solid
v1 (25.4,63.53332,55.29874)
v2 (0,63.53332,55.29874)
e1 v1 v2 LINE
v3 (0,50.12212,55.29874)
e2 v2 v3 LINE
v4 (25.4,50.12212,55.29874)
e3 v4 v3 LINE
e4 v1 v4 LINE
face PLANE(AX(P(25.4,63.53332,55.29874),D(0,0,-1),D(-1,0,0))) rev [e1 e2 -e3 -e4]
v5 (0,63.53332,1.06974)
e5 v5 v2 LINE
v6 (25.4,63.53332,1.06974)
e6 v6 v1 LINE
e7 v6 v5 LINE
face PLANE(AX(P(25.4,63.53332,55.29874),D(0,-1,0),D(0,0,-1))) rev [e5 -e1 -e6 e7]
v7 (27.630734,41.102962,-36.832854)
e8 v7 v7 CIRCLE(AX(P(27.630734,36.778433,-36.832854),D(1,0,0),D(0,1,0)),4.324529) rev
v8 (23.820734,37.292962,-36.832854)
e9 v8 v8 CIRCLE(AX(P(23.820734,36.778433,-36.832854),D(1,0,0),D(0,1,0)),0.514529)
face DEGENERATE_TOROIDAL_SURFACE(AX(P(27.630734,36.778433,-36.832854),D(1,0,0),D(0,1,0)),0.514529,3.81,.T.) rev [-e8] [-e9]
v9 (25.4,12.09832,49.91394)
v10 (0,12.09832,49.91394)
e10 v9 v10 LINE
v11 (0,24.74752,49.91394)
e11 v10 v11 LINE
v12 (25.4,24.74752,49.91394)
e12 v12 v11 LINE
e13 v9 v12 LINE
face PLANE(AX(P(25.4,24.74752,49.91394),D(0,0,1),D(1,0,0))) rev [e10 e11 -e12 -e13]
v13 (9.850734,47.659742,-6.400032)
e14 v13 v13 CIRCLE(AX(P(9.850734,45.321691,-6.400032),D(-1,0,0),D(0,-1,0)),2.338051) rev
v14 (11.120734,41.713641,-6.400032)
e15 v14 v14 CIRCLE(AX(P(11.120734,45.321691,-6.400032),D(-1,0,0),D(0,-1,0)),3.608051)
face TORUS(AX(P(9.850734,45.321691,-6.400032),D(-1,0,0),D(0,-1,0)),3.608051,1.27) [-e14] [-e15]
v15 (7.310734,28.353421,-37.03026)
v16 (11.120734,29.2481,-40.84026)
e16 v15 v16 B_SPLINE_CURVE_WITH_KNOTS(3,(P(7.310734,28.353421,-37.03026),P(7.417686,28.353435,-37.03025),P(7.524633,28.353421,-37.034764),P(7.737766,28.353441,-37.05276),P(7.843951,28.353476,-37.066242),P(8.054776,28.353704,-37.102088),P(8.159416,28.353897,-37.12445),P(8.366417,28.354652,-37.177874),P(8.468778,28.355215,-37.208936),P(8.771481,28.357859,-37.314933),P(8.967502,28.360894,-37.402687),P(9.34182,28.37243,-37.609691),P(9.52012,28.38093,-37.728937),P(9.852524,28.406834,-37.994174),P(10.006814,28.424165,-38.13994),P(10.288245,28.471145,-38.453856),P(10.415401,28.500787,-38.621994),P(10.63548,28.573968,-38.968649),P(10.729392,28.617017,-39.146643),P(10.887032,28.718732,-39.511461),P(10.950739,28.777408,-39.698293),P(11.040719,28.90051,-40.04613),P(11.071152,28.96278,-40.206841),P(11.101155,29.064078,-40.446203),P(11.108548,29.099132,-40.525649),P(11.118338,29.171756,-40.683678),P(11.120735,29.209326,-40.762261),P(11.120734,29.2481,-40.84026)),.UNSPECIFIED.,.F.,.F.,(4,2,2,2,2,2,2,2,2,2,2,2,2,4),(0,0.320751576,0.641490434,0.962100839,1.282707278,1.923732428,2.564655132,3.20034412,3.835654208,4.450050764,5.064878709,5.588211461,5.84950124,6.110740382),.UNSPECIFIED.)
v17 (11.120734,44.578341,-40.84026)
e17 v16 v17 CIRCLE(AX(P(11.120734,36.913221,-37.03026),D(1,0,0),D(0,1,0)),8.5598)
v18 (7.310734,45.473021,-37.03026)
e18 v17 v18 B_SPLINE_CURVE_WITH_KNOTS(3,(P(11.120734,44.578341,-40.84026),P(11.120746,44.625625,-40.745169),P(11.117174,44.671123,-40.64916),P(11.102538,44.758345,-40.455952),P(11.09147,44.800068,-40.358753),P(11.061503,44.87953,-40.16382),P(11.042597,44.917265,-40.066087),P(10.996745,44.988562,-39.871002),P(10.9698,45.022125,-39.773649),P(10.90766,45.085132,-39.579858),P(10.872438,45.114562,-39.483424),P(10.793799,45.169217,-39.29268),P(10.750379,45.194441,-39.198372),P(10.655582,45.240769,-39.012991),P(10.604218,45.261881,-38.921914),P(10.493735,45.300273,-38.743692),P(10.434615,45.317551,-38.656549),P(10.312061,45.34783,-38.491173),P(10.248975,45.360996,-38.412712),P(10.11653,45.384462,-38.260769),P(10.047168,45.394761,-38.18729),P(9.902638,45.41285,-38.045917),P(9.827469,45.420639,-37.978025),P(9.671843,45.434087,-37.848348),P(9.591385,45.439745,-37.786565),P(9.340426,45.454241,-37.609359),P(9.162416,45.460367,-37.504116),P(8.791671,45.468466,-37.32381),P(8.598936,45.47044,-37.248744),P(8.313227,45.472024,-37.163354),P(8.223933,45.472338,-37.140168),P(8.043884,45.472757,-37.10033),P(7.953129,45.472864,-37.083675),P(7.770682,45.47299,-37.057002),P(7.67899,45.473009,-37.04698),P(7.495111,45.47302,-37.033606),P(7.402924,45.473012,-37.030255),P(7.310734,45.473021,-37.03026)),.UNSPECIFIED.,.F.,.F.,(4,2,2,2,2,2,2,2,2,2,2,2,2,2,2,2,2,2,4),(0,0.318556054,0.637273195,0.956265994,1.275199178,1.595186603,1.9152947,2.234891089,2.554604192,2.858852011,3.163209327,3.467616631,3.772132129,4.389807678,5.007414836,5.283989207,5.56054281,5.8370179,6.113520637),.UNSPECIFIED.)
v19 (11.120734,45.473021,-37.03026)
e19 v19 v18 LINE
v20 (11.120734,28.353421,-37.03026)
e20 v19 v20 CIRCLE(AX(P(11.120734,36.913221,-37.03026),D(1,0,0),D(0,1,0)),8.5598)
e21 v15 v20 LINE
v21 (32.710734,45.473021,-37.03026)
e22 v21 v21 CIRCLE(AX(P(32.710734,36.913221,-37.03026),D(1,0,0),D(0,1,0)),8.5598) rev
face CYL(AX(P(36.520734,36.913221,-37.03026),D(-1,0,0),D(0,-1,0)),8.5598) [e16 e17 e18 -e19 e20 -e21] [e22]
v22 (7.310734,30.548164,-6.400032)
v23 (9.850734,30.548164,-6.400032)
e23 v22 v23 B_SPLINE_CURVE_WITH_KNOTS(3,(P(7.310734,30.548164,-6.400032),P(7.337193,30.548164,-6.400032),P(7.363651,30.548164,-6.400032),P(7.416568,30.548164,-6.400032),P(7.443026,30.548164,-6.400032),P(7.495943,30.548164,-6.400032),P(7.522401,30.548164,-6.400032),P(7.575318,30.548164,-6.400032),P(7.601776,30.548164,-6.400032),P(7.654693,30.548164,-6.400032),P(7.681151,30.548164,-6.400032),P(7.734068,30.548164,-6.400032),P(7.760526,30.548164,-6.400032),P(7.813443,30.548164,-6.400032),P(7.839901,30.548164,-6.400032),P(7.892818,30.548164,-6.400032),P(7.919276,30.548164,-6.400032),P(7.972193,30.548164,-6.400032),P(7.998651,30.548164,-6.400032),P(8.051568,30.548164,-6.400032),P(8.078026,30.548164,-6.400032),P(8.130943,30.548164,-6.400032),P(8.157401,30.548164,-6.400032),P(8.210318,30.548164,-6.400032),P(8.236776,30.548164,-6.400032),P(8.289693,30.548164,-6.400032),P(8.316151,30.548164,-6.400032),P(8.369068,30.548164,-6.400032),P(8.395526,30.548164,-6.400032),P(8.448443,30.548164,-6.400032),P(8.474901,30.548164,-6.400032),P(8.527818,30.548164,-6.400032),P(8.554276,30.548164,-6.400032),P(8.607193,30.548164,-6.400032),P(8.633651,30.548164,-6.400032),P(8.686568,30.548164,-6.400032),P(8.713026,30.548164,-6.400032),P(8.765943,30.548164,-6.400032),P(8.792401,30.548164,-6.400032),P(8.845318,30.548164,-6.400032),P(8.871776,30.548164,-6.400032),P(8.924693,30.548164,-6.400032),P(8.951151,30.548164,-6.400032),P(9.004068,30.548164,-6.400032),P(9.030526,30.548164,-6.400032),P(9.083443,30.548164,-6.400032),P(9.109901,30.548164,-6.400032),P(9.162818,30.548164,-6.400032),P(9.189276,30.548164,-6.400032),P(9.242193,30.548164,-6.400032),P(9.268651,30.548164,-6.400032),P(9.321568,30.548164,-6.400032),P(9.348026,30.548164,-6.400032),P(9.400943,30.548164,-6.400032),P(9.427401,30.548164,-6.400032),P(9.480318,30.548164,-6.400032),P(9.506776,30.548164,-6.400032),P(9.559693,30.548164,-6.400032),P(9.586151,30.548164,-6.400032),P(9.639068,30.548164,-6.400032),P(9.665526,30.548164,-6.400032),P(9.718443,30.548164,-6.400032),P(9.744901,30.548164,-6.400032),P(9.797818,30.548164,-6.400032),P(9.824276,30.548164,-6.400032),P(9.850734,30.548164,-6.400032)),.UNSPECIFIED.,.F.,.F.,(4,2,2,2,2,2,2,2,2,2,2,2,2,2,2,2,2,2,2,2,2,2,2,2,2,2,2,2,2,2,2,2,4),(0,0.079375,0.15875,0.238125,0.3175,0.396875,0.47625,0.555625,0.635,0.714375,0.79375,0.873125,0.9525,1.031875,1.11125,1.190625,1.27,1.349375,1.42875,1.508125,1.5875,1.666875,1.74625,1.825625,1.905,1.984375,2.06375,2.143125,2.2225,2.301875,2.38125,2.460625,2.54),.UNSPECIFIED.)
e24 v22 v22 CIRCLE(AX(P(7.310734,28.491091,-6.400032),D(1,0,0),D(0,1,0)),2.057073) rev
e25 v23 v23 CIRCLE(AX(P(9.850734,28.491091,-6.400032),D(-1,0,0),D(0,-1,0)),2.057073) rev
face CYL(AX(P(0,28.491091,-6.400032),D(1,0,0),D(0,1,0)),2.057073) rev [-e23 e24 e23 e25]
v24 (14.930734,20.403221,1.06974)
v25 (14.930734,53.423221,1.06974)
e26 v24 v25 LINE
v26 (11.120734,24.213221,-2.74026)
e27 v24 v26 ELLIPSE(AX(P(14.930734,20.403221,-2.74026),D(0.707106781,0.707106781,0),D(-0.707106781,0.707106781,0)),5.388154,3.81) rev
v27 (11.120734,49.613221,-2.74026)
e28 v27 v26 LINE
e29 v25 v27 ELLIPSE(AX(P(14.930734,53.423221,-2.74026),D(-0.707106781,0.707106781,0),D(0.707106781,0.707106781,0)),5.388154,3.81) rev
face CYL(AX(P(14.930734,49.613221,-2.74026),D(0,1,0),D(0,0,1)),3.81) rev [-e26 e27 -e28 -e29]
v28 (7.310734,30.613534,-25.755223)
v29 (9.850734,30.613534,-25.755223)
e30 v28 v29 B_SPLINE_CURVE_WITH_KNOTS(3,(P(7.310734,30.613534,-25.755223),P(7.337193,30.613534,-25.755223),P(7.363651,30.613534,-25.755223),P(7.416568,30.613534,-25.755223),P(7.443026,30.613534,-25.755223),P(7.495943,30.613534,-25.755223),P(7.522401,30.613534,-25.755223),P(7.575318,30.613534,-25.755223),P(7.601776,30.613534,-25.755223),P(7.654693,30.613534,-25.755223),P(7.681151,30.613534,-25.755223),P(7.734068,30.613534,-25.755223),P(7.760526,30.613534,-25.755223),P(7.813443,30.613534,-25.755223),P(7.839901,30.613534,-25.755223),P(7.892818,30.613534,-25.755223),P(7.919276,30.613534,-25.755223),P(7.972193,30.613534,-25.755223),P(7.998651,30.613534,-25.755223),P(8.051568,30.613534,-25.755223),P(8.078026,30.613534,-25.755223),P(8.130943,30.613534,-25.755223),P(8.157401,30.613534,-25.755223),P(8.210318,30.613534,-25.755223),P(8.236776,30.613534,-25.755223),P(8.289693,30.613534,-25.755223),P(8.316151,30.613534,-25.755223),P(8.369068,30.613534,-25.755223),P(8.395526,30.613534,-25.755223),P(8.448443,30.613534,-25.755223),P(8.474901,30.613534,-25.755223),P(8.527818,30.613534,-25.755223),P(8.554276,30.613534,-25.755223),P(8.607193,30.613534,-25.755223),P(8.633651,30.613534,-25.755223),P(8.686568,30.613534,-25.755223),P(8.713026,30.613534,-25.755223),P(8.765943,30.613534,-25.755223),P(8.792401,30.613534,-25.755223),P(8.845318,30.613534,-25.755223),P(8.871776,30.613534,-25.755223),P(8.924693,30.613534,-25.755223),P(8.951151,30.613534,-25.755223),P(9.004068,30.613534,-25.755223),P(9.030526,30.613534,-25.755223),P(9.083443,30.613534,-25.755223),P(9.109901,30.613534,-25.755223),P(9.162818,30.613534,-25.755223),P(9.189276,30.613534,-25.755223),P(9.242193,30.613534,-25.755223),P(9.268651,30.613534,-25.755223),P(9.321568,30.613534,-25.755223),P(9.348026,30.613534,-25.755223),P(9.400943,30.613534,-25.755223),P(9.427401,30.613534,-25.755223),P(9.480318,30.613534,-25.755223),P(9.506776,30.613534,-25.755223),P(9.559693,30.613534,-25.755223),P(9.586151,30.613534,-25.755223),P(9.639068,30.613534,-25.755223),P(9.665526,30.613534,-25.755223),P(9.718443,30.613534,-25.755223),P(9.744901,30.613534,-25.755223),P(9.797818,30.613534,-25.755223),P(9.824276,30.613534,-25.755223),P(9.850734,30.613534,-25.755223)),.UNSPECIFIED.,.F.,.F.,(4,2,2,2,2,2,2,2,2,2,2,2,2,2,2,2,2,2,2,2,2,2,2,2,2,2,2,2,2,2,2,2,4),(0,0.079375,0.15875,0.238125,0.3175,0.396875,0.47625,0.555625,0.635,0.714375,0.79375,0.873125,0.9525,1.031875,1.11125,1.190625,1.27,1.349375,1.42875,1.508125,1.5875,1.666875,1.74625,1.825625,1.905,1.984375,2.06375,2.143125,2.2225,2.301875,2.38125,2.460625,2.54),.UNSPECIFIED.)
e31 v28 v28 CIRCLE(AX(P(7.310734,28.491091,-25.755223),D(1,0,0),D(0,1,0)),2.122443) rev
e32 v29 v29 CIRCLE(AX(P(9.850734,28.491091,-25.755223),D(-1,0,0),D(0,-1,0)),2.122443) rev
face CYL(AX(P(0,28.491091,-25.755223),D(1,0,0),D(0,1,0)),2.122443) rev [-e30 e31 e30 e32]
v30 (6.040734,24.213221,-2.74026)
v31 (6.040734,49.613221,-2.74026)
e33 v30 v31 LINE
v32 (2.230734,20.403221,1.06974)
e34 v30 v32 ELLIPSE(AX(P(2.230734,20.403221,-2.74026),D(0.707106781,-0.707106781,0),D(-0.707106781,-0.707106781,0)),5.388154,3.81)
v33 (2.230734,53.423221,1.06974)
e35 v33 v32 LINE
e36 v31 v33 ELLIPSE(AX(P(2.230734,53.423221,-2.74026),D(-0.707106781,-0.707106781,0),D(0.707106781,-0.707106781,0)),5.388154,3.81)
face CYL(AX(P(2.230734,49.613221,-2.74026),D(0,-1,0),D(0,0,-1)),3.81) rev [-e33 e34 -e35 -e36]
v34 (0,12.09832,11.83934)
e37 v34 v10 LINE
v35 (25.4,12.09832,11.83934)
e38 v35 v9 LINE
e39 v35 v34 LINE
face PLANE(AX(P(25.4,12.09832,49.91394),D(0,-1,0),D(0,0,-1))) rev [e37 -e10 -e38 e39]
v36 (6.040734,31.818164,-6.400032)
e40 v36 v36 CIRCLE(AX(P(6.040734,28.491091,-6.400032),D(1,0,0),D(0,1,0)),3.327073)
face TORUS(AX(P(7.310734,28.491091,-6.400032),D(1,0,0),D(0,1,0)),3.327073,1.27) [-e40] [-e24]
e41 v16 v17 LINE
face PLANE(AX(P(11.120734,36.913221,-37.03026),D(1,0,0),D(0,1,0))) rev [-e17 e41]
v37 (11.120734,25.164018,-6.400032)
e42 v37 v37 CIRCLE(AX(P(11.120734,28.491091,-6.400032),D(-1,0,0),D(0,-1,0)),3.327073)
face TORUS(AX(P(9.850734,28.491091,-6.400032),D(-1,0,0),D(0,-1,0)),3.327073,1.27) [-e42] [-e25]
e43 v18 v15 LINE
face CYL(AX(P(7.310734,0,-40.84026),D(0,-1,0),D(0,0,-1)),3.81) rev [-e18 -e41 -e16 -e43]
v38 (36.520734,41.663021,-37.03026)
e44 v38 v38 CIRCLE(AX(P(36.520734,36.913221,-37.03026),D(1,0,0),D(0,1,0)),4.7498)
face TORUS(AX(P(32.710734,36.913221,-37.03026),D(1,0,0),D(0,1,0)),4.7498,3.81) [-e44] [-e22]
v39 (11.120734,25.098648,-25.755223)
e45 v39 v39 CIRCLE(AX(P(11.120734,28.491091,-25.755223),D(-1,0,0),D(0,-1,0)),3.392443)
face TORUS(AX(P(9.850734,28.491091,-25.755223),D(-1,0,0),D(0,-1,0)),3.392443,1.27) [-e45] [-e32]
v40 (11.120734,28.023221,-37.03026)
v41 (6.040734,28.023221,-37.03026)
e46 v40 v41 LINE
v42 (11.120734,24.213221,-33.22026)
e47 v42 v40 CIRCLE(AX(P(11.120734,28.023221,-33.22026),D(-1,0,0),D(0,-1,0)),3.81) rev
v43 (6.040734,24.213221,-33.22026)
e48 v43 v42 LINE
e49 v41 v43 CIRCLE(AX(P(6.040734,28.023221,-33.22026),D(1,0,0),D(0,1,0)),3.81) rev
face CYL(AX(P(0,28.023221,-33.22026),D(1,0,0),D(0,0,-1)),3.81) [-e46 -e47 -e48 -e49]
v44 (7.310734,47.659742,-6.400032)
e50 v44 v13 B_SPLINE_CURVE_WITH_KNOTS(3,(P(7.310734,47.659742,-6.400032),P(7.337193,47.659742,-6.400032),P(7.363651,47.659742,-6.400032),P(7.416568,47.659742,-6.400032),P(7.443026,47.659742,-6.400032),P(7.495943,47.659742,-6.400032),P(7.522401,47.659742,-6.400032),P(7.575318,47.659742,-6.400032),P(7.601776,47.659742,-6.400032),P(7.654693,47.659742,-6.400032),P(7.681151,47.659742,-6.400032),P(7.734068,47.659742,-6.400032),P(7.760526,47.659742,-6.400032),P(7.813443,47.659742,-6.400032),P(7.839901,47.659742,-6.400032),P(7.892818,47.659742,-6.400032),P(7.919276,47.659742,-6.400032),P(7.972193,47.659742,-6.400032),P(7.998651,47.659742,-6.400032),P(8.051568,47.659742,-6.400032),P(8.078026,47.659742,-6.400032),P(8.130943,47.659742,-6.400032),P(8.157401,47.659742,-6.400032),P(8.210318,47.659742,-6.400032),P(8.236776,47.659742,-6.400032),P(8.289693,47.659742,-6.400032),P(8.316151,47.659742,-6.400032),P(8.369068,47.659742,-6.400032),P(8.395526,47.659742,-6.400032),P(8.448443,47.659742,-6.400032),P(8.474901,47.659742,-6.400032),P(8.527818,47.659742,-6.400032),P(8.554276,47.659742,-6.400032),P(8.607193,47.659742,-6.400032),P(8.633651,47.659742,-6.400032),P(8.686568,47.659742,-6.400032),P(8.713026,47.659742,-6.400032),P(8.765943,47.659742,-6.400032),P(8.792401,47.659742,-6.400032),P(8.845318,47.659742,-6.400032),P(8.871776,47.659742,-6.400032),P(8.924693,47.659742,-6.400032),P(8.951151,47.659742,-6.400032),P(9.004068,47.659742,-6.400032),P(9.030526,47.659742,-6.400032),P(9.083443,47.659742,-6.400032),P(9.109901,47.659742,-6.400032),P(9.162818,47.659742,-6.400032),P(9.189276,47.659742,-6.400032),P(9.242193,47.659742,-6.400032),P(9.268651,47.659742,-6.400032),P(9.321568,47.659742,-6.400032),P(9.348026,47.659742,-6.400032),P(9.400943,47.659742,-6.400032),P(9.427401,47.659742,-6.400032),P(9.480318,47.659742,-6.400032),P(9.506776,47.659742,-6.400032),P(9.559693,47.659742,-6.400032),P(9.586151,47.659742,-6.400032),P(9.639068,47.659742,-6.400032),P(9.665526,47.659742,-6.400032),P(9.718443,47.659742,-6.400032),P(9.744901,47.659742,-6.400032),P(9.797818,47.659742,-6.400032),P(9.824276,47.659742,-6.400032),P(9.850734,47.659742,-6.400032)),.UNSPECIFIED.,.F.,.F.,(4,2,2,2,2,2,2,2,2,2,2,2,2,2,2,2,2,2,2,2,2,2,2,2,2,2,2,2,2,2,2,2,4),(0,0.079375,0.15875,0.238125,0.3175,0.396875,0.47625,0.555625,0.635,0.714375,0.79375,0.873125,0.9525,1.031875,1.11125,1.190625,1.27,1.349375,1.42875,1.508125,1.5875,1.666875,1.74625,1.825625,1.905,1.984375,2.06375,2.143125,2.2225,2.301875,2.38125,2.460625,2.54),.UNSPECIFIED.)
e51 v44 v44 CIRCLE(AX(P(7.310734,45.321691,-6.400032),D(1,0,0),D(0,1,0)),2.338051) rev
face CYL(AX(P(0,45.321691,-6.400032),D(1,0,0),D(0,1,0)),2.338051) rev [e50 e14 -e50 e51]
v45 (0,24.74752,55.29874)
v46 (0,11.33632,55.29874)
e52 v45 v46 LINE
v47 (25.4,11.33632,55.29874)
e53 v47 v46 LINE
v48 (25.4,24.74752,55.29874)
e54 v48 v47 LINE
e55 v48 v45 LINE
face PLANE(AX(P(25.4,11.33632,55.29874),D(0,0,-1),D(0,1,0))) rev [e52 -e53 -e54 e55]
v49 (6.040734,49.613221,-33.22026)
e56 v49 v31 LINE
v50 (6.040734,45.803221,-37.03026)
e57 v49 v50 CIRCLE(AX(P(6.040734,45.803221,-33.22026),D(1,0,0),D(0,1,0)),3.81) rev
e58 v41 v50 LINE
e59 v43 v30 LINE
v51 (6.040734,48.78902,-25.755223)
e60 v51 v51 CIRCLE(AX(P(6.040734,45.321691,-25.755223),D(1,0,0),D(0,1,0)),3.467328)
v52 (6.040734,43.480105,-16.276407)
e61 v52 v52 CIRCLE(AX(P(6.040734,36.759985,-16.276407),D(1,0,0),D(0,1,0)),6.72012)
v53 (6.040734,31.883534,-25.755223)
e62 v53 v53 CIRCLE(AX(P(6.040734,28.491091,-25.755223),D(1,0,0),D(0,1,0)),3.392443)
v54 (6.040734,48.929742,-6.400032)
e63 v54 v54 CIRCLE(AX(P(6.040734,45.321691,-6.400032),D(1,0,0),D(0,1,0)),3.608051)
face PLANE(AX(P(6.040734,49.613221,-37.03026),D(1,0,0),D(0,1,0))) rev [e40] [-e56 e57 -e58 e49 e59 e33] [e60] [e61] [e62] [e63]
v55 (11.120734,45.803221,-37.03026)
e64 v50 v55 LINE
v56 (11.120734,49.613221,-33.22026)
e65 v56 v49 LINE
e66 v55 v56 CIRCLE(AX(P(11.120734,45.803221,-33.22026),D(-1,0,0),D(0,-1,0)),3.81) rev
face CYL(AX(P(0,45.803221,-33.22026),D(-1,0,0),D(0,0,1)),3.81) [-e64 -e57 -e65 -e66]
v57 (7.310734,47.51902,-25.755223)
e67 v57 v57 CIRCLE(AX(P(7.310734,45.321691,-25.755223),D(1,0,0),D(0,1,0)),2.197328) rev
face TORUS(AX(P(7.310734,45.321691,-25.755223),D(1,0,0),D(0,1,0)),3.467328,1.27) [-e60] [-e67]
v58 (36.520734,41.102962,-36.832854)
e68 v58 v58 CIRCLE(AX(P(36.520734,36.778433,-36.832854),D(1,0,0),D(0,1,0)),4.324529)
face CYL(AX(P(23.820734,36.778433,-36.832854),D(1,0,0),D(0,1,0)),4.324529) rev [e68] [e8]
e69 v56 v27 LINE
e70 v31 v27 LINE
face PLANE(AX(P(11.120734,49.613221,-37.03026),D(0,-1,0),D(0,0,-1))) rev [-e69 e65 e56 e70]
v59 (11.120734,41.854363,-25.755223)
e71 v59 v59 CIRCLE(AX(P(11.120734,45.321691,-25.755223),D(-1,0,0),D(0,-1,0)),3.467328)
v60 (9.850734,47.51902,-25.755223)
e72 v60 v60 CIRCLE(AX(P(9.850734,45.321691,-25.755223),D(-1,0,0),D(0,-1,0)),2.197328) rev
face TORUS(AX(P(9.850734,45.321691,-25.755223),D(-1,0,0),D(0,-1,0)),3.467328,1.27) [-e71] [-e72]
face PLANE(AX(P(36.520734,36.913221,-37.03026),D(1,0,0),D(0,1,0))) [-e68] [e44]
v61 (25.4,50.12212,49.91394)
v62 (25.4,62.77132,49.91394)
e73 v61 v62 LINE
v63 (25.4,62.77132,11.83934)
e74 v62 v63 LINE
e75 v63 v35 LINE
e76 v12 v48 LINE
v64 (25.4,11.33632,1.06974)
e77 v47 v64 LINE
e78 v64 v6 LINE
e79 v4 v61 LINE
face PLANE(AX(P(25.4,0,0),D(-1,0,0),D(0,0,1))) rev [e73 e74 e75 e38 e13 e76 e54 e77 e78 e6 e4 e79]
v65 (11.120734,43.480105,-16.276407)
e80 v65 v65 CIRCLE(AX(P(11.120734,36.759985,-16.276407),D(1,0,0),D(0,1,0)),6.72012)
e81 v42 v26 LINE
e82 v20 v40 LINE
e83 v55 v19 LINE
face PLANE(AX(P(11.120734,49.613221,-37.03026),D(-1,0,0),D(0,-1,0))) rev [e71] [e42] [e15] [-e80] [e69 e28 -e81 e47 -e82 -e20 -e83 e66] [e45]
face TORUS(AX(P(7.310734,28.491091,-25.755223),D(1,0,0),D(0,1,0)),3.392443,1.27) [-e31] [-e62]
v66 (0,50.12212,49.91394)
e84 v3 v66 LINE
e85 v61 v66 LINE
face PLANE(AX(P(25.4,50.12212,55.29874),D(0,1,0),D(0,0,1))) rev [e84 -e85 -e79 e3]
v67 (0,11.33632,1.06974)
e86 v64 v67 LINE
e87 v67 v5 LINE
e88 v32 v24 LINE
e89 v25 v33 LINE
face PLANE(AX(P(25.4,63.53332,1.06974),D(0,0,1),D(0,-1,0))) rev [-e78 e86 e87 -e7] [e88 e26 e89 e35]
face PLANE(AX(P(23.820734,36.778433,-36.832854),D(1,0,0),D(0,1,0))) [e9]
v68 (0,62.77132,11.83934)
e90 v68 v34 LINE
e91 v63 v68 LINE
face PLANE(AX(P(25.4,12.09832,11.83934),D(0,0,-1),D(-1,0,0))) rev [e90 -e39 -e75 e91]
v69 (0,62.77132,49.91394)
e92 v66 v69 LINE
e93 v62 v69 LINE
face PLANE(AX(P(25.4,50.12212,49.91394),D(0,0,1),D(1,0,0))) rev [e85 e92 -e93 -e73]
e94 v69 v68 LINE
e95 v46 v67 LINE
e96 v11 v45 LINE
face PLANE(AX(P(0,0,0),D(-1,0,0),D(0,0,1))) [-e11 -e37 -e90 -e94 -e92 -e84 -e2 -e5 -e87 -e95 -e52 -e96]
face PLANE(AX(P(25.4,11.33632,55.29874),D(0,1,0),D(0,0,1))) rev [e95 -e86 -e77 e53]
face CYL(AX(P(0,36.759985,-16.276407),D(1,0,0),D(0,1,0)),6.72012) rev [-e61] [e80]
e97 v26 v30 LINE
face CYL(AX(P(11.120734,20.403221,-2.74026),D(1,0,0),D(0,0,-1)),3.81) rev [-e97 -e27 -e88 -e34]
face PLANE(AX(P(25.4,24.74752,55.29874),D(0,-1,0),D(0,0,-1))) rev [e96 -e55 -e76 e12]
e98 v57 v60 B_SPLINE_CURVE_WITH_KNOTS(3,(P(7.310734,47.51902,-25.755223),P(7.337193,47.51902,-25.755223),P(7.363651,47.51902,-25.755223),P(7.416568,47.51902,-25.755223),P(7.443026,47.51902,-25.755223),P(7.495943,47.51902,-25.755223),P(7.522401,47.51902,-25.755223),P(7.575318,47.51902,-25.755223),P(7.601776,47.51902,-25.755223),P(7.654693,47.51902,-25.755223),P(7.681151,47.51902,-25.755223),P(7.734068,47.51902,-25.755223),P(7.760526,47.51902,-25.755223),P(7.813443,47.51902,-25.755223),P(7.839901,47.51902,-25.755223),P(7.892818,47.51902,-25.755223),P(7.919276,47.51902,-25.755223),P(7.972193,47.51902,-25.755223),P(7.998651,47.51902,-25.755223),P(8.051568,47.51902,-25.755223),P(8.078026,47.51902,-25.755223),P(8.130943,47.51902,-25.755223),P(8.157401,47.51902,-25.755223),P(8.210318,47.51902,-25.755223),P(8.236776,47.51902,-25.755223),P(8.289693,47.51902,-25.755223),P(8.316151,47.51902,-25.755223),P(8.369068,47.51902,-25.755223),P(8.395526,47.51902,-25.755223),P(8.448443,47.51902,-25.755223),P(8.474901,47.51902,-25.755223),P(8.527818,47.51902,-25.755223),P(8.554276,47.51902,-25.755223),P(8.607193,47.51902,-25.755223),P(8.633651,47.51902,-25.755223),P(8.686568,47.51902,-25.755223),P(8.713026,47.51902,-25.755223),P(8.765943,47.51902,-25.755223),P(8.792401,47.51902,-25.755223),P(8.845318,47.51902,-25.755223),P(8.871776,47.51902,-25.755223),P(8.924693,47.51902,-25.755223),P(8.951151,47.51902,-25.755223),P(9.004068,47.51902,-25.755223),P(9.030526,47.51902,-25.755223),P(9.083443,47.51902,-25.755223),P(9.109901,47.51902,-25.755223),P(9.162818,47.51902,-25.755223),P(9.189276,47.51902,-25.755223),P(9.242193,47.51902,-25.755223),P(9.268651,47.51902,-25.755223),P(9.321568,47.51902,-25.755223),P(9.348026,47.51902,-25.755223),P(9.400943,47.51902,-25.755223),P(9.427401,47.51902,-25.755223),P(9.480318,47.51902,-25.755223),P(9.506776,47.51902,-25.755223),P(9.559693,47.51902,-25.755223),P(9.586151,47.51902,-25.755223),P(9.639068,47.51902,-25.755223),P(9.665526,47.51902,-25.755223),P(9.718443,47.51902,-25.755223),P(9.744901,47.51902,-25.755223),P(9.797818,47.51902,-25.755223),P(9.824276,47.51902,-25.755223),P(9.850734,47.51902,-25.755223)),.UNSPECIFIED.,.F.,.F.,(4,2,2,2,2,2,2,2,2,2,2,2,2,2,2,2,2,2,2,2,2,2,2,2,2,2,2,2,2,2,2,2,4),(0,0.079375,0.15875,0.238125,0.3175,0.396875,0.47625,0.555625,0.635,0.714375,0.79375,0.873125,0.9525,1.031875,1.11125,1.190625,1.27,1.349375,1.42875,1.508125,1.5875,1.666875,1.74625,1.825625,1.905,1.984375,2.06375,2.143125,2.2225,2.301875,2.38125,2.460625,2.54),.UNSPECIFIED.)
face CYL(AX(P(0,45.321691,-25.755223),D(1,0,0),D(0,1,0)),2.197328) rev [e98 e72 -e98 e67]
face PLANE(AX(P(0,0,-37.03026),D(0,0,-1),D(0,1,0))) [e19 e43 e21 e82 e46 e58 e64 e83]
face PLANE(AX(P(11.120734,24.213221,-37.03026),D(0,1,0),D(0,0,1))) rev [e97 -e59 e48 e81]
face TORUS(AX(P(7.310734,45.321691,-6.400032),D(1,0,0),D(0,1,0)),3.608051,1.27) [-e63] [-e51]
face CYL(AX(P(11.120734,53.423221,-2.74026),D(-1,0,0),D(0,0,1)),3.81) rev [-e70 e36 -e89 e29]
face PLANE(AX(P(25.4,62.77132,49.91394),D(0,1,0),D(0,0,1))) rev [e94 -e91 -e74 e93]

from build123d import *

# Parameters (mm, degrees)
BOSS_EXTRUDE1_DEPTH = 25.4
SKETCH3_W           = 5.08
SKETCH3_H           = 25.4
BOSS_EXTRUDE2_DEPTH = 38.1
SKETCH5_R           = 8.5598
BOSS_EXTRUDE3_DEPTH = 25.4
SKETCH6_R           = 6.720119977
CUT_EXTRUDE1_DEPTH  = 88.97495844
FILLET1_R           = 3.81
FILLET2_R           = 3.81
SKETCH7_R           = 4.32452928
CUT_EXTRUDE2_DEPTH  = 12.7
FILLET3_R           = 3.81
SKETCH8_R           = 2.122443339
SKETCH8_R_2         = 2.197328391
SKETCH8_R_3         = 2.338050865
SKETCH8_R_4         = 2.057073387
CUT_EXTRUDE3_DEPTH  = 88.974958469
FILLET4_R           = 3.81
FILLET5_R           = 1.27


with BuildPart() as part:
    # Sketch1 → Boss-Extrude1 (new body)
    with BuildSketch(Plane.YZ):
        Polygon((11.336319652, 55.298739647), (24.747519652, 55.298739647), (24.747519652, 49.913939647), (12.098319652, 49.913939647), (12.098319652, 11.839339647), (62.771319652, 11.839339647), (62.771319652, 49.913939647), (50.122119652, 49.913939647), (50.122119652, 55.298739647), (63.533319652, 55.298739647), (63.533319652, 1.069739647), (11.336319652, 1.069739647), align=None)
    extrude(amount=BOSS_EXTRUDE1_DEPTH)

    # Sketch3 → Boss-Extrude2 (add)
    with BuildSketch(Plane(origin=(0, 0, 1.069739647), x_dir=(1, 0, 0), z_dir=(0, 0, -1))):
        with Locations((8.5807342, -36.91322057)):
            Rectangle(SKETCH3_W, SKETCH3_H)
    extrude(amount=BOSS_EXTRUDE2_DEPTH)

    # Sketch5 → Boss-Extrude3 (add)
    with BuildSketch(Plane.YZ.offset(11.1207342)):
        with Locations((36.91322057, -37.030260353)):
            Circle(SKETCH5_R)
    extrude(amount=BOSS_EXTRUDE3_DEPTH)

    # Sketch6 → Cut-Extrude1 (cut, through all)
    with BuildSketch(Plane.YZ.offset(11.1207342)):
        with Locations((36.75998496, -16.276406843)):
            Circle(SKETCH6_R)
    extrude(amount=-CUT_EXTRUDE1_DEPTH, mode=Mode.SUBTRACT)

    # Fillet1
    # the kernel refuses this fillet: 3.81 mm, written as the material it adds along each edge
    with BuildSketch(Plane(origin=(11.1207342, 18.82842057, -37.030260353), x_dir=(-1, 0, 0), z_dir=(0, 1, 0))) as fillet1_piece_1_section:
        with BuildLine():
            CenterArc((FILLET1_R, -FILLET1_R), FILLET1_R, 90, 90)
            Line((0, -FILLET1_R), (0, 0))
            Line((0, 0), (FILLET1_R, 0))
        make_face()
    fillet1_piece_1 = extrude(amount=36.1696, mode=Mode.PRIVATE)
    fillet1_piece_1 = fillet1_piece_1 & Plane(origin=(10.265201689, 36.91322057, -37.030260353), x_dir=(0, 1, 0), z_dir=(-1, 0, 0)) * Cylinder(8.5598, 88, mode=Mode.PRIVATE)
    add(fillet1_piece_1)

    # Fillet2
    fillet2_edges = [part.edges().sort_by_distance(p)[0] for p in [
        (6.0407342, 36.91322057, 1.069739647),
        (8.5807342, 49.61322057, 1.069739647),
        (11.1207342, 36.91322057, 1.069739647),
        (8.5807342, 24.21322057, 1.069739647),
    ]]
    fillet(fillet2_edges, radius=FILLET2_R)

    # Sketch7 → Cut-Extrude2 (cut, symmetric)
    with BuildSketch(Plane.YZ.offset(36.5207342)):
        with Locations((36.778432594, -36.832854178)):
            Circle(SKETCH7_R)
    extrude(amount=CUT_EXTRUDE2_DEPTH, both=True, mode=Mode.SUBTRACT)

    # Fillet3
    fillet3_edges = [part.edges().sort_by_distance(p)[0] for p in [
        (23.8207342, 32.453903314, -36.832854178),
    ]]
    fillet(fillet3_edges, radius=FILLET3_R)

    # Sketch8 → Cut-Extrude3 (cut, through all)
    with BuildSketch(Plane.YZ.offset(11.1207342)):
        with Locations((28.491090994, -25.75522287)):
            Circle(SKETCH8_R)
        with Locations((45.321691436, -25.75522287)):
            Circle(SKETCH8_R_2)
        with Locations((45.321691436, -6.400032362)):
            Circle(SKETCH8_R_3)
        with Locations((28.491090994, -6.400032362)):
            Circle(SKETCH8_R_4)
    extrude(amount=-CUT_EXTRUDE3_DEPTH, mode=Mode.SUBTRACT)

    # Fillet4
    fillet4_edges = [part.edges().sort_by_distance(p)[0] for p in [
        (8.5807342, 49.61322057, -37.030260353),
        (8.5807342, 24.21322057, -37.030260353),
        (36.5207342, 28.35342057, -37.030260353),
    ]]
    fillet(fillet4_edges, radius=FILLET4_R)

    # Fillet5
    fillet5_edges = [part.edges().sort_by_distance(p)[0] for p in [
        (6.0407342, 26.434017606, -6.400032362),
        (11.1207342, 26.434017606, -6.400032362),
        (6.0407342, 42.983640571, -6.400032362),
        (11.1207342, 42.983640571, -6.400032362),
        (6.0407342, 43.124363045, -25.75522287),
        (11.1207342, 43.124363045, -25.75522287),
        (6.0407342, 26.368647655, -25.75522287),
        (11.1207342, 26.368647655, -25.75522287),
    ]]
    fillet(fillet5_edges, radius=FILLET5_R)


solid = part.part
